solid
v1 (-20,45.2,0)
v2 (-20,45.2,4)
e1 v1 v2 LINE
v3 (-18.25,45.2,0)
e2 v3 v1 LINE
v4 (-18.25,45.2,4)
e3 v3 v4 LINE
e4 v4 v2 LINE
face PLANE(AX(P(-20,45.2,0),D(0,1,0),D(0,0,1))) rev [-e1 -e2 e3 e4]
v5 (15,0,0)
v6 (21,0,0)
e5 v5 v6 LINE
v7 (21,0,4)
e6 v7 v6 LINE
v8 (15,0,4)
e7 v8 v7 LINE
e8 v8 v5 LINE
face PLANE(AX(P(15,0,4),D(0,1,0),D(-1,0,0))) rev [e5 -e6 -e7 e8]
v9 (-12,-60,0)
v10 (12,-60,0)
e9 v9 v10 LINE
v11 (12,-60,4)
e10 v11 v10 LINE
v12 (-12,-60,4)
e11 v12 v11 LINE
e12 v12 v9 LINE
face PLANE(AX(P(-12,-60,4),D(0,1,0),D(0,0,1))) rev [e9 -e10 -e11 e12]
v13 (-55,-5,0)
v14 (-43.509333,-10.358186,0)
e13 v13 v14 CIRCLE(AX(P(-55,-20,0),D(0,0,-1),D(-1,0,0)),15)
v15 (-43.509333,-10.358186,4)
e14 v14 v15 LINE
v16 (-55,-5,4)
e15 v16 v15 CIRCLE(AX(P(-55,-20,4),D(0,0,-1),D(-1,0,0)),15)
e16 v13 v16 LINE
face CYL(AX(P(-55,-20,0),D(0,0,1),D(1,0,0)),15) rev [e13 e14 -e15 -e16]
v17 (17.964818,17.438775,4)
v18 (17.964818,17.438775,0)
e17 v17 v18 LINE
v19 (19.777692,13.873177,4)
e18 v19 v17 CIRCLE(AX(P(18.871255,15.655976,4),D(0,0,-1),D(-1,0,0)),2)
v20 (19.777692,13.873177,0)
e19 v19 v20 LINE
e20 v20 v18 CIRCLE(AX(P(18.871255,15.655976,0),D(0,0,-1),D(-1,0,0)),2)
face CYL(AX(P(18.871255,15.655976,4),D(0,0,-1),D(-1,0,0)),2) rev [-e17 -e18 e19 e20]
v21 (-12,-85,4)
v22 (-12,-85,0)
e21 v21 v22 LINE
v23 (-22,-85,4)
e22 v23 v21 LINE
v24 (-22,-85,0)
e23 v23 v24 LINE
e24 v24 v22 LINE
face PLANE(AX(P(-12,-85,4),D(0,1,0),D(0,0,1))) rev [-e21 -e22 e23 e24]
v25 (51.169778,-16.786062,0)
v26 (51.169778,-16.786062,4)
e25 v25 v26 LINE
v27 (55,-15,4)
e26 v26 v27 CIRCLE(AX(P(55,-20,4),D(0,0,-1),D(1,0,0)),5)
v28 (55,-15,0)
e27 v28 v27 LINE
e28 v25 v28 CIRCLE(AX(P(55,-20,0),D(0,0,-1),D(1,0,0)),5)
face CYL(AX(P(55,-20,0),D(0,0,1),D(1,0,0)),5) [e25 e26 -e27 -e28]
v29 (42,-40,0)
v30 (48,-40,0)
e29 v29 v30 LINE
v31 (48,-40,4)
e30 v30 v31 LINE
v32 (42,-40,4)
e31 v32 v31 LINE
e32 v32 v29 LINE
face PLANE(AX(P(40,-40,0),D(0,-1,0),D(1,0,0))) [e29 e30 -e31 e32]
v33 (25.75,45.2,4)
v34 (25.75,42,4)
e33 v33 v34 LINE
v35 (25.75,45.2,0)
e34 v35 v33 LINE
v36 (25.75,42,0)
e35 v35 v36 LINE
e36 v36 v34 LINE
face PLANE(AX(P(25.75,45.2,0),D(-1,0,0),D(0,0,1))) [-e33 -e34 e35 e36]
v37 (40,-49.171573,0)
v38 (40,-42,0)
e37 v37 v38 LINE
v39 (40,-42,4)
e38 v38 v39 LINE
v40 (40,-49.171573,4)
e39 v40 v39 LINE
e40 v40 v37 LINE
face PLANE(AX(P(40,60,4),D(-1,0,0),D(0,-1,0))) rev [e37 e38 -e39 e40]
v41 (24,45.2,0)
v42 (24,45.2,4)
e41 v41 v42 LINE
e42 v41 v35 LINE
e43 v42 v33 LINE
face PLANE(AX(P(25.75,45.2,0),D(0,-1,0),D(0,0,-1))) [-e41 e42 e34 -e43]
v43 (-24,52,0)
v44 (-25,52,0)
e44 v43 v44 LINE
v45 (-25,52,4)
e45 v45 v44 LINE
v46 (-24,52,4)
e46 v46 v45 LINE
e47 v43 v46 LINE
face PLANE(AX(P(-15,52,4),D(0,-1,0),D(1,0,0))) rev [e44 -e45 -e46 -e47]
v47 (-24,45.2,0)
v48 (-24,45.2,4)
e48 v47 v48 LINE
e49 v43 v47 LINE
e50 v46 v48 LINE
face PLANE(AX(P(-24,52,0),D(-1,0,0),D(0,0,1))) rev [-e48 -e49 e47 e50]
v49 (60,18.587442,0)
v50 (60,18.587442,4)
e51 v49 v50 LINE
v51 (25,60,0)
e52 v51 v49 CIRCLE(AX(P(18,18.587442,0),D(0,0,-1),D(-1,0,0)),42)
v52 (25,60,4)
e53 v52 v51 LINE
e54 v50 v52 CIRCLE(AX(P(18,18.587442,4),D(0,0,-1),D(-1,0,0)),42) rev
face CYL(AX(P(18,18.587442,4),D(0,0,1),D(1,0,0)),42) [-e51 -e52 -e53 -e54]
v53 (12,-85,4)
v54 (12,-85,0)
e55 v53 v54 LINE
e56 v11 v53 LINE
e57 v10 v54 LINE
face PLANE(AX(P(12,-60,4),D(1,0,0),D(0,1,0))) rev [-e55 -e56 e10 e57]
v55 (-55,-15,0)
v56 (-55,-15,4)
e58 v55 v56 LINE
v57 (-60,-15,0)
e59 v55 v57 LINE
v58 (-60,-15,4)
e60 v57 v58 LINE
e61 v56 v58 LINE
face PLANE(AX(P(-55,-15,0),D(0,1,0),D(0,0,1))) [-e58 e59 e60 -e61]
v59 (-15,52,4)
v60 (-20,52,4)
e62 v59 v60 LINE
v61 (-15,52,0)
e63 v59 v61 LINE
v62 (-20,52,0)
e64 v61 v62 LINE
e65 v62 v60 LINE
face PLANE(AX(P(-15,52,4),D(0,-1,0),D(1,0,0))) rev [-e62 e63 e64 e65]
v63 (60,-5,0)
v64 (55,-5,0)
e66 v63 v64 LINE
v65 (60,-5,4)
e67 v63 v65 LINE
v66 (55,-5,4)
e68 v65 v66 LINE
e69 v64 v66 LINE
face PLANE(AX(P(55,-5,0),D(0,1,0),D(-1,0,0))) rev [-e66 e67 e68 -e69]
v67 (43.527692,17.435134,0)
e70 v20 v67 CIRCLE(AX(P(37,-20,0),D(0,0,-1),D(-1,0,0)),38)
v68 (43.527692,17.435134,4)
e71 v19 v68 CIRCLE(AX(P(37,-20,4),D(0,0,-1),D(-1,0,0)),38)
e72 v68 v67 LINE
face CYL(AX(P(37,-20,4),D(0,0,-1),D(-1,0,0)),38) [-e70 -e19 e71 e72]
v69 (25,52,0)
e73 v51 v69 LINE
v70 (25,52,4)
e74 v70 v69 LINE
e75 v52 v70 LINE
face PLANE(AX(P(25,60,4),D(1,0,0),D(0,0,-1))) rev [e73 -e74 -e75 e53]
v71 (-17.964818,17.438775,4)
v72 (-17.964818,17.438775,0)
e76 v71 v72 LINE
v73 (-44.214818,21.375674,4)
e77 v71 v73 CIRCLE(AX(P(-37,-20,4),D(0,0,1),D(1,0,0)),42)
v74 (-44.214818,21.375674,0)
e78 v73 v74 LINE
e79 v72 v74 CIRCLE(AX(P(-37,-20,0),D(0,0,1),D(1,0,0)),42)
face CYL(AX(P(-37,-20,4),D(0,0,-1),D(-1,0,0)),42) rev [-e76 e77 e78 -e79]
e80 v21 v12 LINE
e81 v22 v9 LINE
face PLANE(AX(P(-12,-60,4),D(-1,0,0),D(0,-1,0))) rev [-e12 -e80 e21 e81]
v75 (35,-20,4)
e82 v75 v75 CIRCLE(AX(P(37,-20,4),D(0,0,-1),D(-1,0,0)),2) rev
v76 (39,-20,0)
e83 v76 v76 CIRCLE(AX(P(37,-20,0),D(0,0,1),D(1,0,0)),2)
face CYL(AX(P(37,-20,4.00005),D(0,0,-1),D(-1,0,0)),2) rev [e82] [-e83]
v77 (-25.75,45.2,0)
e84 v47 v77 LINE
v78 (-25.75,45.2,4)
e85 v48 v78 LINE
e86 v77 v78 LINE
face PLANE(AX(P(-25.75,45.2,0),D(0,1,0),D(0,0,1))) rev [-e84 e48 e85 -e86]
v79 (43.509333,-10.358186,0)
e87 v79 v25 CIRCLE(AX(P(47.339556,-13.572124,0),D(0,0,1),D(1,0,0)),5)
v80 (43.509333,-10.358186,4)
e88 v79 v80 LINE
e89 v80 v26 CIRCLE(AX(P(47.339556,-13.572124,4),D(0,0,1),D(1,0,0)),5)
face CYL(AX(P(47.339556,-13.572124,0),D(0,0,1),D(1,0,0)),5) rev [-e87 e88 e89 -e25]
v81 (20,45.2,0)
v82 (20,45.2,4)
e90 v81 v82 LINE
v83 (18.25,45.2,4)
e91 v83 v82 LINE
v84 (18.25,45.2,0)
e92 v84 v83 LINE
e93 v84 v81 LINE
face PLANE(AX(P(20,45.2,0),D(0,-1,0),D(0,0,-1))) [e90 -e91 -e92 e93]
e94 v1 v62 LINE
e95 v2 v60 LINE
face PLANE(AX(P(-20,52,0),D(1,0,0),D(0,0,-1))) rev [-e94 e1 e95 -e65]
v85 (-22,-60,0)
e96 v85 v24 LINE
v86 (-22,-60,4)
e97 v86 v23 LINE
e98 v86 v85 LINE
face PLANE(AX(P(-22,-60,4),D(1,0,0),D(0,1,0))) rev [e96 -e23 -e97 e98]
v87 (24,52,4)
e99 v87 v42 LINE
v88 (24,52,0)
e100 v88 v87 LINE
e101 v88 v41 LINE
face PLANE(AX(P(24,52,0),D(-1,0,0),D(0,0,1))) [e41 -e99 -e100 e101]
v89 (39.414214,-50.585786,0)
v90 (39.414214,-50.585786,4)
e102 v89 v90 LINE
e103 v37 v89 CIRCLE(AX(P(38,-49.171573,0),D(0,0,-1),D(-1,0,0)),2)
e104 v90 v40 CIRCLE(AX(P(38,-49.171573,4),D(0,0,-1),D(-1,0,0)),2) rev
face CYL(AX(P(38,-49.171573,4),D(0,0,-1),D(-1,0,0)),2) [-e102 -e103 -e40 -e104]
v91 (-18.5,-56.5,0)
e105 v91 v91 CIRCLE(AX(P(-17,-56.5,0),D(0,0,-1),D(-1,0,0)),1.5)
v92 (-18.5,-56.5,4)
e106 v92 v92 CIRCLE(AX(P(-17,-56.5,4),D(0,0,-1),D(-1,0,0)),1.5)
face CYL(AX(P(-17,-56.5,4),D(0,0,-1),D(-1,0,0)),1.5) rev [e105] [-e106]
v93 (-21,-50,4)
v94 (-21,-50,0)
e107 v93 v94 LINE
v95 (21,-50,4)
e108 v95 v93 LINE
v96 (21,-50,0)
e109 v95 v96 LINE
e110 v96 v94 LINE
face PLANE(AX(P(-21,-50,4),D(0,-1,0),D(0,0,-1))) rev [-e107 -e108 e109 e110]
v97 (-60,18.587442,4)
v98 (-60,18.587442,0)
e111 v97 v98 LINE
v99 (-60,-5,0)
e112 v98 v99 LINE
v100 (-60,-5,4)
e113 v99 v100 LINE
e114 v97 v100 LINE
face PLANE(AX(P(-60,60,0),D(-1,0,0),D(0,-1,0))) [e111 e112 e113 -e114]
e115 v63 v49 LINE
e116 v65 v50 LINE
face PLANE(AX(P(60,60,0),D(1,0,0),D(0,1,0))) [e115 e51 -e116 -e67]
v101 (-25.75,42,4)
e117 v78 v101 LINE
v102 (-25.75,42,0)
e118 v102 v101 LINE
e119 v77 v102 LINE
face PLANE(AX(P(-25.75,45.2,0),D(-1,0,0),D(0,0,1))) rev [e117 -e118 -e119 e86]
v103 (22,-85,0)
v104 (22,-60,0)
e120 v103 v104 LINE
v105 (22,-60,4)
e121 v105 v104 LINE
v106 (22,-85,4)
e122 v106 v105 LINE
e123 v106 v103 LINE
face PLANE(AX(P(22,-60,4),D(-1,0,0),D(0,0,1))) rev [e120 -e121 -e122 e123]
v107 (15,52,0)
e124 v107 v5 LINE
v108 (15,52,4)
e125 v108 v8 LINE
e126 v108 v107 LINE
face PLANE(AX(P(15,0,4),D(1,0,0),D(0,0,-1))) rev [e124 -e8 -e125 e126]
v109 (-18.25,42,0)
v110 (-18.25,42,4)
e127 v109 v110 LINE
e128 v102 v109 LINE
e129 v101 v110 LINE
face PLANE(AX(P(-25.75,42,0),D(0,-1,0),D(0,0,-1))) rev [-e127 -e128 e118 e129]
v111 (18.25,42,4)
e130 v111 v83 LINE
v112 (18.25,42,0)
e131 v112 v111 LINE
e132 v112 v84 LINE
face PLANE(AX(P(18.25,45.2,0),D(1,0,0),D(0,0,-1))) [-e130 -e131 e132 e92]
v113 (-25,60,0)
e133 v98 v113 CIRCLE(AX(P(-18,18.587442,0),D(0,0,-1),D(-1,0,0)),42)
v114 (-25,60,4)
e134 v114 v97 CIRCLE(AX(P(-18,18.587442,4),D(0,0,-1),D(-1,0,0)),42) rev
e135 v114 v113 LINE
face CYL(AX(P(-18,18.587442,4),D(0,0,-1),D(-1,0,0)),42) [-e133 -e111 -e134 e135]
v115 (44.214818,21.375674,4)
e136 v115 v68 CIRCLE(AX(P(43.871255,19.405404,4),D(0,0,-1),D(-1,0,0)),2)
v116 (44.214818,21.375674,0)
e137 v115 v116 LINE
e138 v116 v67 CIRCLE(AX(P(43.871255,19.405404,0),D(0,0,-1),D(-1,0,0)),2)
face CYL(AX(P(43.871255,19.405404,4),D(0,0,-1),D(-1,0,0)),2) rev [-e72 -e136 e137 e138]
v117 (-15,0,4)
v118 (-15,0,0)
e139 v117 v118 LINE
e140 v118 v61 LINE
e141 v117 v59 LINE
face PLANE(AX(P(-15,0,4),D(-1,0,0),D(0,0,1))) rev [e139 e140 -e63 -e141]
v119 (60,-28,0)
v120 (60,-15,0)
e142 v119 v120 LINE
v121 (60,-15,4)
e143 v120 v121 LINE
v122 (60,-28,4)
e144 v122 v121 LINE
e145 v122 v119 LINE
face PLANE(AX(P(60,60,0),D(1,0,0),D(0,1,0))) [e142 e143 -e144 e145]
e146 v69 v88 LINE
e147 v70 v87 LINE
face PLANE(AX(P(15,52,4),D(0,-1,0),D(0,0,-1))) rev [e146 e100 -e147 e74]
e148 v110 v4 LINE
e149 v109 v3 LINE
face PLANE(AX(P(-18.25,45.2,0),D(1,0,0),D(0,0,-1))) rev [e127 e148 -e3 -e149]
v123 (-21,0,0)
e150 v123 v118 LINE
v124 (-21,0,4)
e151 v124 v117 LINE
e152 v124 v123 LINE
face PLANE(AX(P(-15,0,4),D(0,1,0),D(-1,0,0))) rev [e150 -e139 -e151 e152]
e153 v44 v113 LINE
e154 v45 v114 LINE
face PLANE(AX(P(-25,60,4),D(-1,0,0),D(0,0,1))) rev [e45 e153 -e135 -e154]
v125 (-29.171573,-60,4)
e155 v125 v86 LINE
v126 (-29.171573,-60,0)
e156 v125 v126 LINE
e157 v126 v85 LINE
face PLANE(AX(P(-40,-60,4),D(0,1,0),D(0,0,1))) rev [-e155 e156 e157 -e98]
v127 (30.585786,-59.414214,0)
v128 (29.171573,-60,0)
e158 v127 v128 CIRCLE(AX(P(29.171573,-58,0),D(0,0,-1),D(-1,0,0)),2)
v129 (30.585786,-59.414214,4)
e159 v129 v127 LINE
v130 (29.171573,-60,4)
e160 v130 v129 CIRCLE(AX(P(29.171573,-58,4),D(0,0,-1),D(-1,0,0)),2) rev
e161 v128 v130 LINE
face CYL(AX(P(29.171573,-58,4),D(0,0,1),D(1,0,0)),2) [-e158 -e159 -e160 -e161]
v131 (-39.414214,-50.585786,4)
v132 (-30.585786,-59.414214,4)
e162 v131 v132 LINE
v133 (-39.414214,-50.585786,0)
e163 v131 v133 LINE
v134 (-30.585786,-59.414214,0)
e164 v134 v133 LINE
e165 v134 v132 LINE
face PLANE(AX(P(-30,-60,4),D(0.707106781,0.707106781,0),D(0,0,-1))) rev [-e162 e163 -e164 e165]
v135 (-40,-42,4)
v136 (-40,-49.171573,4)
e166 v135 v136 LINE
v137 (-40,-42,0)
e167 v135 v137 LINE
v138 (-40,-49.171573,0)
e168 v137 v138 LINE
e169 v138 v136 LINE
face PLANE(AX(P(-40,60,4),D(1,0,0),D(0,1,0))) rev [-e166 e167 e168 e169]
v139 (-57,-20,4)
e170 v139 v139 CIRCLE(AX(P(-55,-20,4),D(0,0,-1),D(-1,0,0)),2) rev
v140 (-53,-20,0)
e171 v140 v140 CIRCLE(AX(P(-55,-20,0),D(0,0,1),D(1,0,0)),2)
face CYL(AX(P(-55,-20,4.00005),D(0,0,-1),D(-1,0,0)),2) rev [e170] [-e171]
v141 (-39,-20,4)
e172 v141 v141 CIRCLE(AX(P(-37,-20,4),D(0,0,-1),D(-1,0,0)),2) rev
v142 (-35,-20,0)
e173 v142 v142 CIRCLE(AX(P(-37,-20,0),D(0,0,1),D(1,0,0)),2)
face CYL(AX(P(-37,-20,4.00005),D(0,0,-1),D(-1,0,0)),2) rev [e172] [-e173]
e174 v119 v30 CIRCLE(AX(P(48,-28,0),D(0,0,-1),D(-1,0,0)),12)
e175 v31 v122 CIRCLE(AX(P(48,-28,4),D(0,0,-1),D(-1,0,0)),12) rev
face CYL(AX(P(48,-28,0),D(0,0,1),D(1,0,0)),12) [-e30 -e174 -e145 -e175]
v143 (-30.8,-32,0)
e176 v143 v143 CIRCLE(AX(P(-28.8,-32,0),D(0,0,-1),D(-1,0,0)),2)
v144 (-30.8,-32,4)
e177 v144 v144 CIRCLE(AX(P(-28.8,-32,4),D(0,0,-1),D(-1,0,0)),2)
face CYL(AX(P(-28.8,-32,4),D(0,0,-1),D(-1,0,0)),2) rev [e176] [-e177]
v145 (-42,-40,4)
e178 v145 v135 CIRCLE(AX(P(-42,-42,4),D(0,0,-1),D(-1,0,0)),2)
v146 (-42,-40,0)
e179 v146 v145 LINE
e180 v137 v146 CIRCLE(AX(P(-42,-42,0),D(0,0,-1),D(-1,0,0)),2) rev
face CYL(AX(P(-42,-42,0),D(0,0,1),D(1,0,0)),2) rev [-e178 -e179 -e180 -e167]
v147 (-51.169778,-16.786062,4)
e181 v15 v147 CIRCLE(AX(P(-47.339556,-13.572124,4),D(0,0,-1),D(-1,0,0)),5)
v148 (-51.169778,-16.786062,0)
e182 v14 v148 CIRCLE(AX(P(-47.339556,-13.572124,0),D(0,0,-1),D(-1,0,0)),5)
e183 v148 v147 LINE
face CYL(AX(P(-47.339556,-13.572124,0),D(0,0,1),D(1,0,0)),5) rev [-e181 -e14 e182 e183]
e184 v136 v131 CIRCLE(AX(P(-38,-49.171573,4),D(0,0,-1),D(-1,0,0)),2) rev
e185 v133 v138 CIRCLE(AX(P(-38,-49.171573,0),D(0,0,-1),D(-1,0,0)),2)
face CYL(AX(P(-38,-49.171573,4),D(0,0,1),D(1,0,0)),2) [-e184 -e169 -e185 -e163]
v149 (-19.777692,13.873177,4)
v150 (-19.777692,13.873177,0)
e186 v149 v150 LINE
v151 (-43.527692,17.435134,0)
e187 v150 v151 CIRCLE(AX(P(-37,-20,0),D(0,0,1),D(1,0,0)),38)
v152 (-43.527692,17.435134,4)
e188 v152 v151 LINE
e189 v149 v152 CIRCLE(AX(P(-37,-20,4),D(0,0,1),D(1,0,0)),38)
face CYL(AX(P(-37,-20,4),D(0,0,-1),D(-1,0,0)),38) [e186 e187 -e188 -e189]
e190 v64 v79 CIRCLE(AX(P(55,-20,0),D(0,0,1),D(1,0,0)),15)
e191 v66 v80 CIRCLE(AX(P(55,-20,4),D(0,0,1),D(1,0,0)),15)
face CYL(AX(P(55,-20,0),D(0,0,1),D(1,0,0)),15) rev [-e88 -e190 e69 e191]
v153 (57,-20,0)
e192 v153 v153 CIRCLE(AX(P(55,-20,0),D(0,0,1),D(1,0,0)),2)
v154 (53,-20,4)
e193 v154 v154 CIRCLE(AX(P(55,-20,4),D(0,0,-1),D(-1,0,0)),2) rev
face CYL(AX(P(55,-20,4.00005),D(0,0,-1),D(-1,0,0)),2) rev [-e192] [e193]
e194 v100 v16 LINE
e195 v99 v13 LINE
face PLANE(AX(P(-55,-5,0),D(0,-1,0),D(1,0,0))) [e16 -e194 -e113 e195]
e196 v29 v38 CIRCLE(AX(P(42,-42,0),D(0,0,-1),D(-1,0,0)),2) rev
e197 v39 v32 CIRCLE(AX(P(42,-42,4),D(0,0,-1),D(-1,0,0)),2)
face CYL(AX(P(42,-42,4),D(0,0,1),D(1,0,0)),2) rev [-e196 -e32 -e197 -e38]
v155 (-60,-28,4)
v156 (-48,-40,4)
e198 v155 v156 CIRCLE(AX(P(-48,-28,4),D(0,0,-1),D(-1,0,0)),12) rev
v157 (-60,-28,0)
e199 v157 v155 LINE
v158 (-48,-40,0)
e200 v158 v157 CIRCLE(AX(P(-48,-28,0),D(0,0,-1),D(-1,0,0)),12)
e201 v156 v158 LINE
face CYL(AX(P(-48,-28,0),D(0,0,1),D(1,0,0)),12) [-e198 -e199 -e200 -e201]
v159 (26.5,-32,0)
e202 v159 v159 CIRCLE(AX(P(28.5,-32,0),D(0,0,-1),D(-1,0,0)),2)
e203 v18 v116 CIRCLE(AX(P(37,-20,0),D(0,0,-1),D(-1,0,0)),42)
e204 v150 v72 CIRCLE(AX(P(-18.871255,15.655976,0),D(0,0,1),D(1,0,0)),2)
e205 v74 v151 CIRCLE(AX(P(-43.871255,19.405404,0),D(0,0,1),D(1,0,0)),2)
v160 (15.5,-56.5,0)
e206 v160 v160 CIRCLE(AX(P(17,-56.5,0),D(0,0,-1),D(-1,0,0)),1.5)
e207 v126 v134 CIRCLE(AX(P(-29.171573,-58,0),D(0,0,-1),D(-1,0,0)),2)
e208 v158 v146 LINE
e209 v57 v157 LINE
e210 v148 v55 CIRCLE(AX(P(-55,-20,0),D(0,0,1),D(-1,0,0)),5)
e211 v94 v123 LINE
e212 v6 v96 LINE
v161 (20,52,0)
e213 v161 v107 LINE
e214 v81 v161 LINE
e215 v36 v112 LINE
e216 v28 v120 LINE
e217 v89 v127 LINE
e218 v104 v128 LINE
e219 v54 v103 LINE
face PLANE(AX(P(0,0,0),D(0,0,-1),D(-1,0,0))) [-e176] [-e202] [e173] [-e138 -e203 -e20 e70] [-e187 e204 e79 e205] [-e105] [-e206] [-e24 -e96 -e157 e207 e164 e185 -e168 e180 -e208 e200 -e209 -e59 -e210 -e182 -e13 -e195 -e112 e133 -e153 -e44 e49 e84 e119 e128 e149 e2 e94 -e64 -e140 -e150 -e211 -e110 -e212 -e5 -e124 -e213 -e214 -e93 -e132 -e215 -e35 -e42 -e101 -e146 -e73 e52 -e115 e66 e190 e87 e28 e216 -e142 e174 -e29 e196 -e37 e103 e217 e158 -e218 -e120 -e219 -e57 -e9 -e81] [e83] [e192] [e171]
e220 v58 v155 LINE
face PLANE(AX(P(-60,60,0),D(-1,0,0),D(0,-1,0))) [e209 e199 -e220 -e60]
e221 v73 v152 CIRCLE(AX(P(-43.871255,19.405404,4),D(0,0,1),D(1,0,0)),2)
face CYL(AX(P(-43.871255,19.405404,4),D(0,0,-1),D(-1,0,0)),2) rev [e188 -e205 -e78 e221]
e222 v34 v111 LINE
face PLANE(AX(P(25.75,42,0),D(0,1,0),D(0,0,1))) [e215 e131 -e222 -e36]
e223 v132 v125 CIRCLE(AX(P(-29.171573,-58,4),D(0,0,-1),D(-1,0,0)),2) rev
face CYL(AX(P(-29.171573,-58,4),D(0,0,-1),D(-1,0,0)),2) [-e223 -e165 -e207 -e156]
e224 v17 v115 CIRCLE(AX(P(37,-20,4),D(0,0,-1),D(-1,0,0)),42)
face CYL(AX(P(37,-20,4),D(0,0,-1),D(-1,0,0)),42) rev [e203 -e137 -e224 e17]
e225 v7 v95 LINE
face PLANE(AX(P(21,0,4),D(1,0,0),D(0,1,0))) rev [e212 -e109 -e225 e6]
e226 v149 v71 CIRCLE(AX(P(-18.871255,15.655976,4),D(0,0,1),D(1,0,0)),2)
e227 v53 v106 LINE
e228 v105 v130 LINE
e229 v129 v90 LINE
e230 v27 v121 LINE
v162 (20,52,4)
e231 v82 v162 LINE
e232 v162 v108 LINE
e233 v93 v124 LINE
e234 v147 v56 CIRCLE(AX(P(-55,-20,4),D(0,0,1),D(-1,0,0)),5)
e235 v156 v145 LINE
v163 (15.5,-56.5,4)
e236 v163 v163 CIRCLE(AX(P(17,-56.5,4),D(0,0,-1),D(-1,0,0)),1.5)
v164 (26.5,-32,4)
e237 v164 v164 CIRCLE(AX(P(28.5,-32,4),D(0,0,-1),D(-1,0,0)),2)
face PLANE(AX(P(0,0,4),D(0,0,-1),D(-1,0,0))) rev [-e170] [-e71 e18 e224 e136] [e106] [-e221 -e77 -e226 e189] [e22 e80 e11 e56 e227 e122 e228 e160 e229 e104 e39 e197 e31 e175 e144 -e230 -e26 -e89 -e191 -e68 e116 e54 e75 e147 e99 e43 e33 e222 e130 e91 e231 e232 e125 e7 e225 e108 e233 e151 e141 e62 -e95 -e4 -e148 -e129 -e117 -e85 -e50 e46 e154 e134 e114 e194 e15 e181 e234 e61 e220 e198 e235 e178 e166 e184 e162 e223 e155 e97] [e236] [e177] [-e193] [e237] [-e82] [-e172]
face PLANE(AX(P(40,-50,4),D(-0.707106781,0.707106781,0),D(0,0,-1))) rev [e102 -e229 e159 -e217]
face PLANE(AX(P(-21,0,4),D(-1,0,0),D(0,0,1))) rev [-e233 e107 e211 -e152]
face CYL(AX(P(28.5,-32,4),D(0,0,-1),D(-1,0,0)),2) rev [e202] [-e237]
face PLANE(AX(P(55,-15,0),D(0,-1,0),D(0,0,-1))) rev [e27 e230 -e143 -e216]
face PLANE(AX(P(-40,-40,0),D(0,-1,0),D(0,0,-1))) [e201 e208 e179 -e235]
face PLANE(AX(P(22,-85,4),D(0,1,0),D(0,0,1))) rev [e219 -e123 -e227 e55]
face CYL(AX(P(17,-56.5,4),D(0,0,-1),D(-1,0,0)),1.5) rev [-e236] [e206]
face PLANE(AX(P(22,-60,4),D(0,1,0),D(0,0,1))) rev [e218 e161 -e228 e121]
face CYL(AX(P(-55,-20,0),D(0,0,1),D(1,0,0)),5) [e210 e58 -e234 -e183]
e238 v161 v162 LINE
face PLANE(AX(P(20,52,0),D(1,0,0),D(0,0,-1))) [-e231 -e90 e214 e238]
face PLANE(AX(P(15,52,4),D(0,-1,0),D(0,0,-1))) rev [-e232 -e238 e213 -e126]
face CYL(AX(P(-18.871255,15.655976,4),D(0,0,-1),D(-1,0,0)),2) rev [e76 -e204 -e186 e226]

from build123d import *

# Parameters (mm, degrees)
BOSS_EXTRUDE1_DEPTH = 4
SKETCH2_R           = 2
SKETCH2_R_2         = 1.5
CUT_EXTRUDE1_DEPTH  = 95.026591983
SKETCH4_W           = 20
SKETCH4_H           = 100
BOSS_EXTRUDE2_DEPTH = 4
FILLET3_R           = 42
FILLET4_R           = 12
SKETCH7_R           = 2
CUT_EXTRUDE3_DEPTH  = 105.120122935
CHAMFER1_SIZE       = 10
FILLET8_R           = 2
CUT_EXTRUDE4_DEPTH  = 105.120122935
CUT_EXTRUDE5_DEPTH  = 105.120122935
SKETCH10_R          = 2
CUT_EXTRUDE6_DEPTH  = 105.120122935


with BuildPart() as part:
    # Sketch1 → Boss-Extrude1 (new body)
    with BuildSketch(Plane.XY):
        Polygon((-40, 60), (-25, 60), (-25, 52), (-15, 52), (-15, 0), (-21, 0), (-21, -50), (21, -50), (21, 0), (15, 0), (15, 52), (25, 52), (25, 60), (40, 60), (40, -60), (22, -60), (22, -85), (12, -85), (12, -60), (-12, -60), (-12, -85), (-22, -85), (-22, -60), (-40, -60), align=None)
    extrude(amount=BOSS_EXTRUDE1_DEPTH)

    # Sketch2 → Cut-Extrude1 (cut, through all)
    with BuildSketch(Plane(origin=(0, 0, 0), x_dir=(-1, 0, 0), z_dir=(0, 0, -1))):
        with Locations((-28.5, -32)):
            Circle(SKETCH2_R)
        with Locations((17, -56.5)):
            Circle(SKETCH2_R_2)
        with Locations((28.8, -32)):
            Circle(SKETCH2_R)
        with Locations((-17, -56.5)):
            Circle(SKETCH2_R_2)
    extrude(amount=-CUT_EXTRUDE1_DEPTH, mode=Mode.SUBTRACT)

    # Sketch4 → Boss-Extrude2 (add)
    with BuildSketch(Plane.XY.offset(4)):
        with Locations((-50, 10)):
            Rectangle(SKETCH4_W, SKETCH4_H)
        with Locations((50, 10)):
            Rectangle(SKETCH4_W, SKETCH4_H)
    extrude(amount=-BOSS_EXTRUDE2_DEPTH)

    # Fillet3
    # the kernel refuses this fillet: 42 mm, written as the material it takes off along each edge
    with BuildSketch(Plane(origin=(60, 60, 107.531396204), x_dir=(0, -1, 0), z_dir=(0, 0, -1))) as fillet3_piece_1:
        with BuildLine():
            CenterArc((41.412558482, 42), FILLET3_R, 189.594068227, 80.405931773)
            Line((0, 35), (-0.82825117, 34.86))
            ThreePointArc((-0.82825117, 34.86), (-0.84, 17.5), (-0.84, 0))
            Line((-0.84, 0), (0, -0.84))
            Line((0, -0.84), (41.412558482, -0.84))
            Line((41.412558482, -0.84), (41.412558482, 0))
        make_face()
    extrude(amount=211.062792409, mode=Mode.SUBTRACT)
    with BuildSketch(Plane(origin=(-60, 60, 107.531396204), x_dir=(1, 0, 0), z_dir=(0, 0, -1))) as fillet3_piece_2:
        with BuildLine():
            CenterArc((42, 41.412558482), FILLET3_R, 180, 80.405931773)
            Line((0, 41.412558482), (-0.84, 41.412558482))
            Line((-0.84, 41.412558482), (-0.84, 0))
            Line((-0.84, 0), (0, -0.84))
            ThreePointArc((0, -0.84), (17.5, -0.84), (34.86, -0.82825117))
            Line((34.86, -0.82825117), (35, 0))
        make_face()
    extrude(amount=211.062792409, mode=Mode.SUBTRACT)

    # Fillet4
    fillet4_edges = [part.edges().sort_by_distance(p)[0] for p in [
        (60, -40, 2),
        (-60, -40, 2),
    ]]
    fillet(fillet4_edges, radius=FILLET4_R)

    # Sketch7 → Cut-Extrude3 (cut, through all)
    with BuildSketch(Plane.XY):
        with Locations(Location((-55, -20, 0), (0, 0, 180))):
            Circle(SKETCH7_R)
        with Locations(Location((55, -20, 0), (0, 0, 180))):
            Circle(SKETCH7_R)
        with Locations(Location((-37, -20, 0), (0, 0, 180))):
            Circle(SKETCH7_R)
        with Locations(Location((37, -20, 0), (0, 0, 180))):
            Circle(SKETCH7_R)
    extrude(amount=CUT_EXTRUDE3_DEPTH, mode=Mode.SUBTRACT)

    # Chamfer1
    chamfer1_edges = [part.edges().sort_by_distance(p)[0] for p in [
        (-40, -60, 2),
        (40, -60, 2),
    ]]
    chamfer(chamfer1_edges, length=CHAMFER1_SIZE)

    # Fillet8
    fillet8_edges = [part.edges().sort_by_distance(p)[0] for p in [
        (-30, -60, 2),
        (-40, -50, 2),
        (30, -60, 2),
        (40, -50, 2),
        (40, -40, 2),
        (-40, -40, 2),
    ]]
    fillet(fillet8_edges, radius=FILLET8_R)

    # Sketch8 → Cut-Extrude4 (cut, through all)
    with BuildSketch(Plane(origin=(0, 0, 0), x_dir=(-1, 0, 0), z_dir=(0, 0, -1))):
        with BuildLine():
            ThreePointArc((-17.964817996, 17.438774634), (-30.770630407, 21.535466224), (-44.214817996, 21.375674028))
            ThreePointArc((-44.214817996, 21.375674028), (-45.841525426, 19.061841075), (-43.527692473, 17.435133644))
            ThreePointArc((-43.527692473, 17.435133644), (-31.363903701, 17.579707536), (-19.777692473, 13.87317705))
            ThreePointArc((-19.777692473, 13.87317705), (-17.088456442, 14.749538603), (-17.964817996, 17.438774634))
        make_face()
        with BuildLine():
            ThreePointArc((17.964817996, 17.438774634), (30.770630407, 21.535466224), (44.214817996, 21.375674028))
            ThreePointArc((44.214817996, 21.375674028), (45.841525426, 19.061841075), (43.527692473, 17.435133644))
            ThreePointArc((43.527692473, 17.435133644), (31.363903701, 17.579707536), (19.777692473, 13.87317705))
            ThreePointArc((19.777692473, 13.87317705), (17.088456442, 14.749538603), (17.964817996, 17.438774634))
        make_face()
    extrude(amount=-CUT_EXTRUDE4_DEPTH, mode=Mode.SUBTRACT)

    # Sketch9 → Cut-Extrude5 (cut, through all)
    with BuildSketch(Plane.XY.offset(4)):
        Polygon((-24, 52), (-20, 52), (-20, 45.2), (-18.25, 45.2), (-18.25, 42), (-25.75, 42), (-25.75, 45.2), (-24, 45.2), align=None)
    cut_extrude5 = extrude(amount=-CUT_EXTRUDE5_DEPTH, mode=Mode.SUBTRACT)

    # Mirror1: Cut-Extrude5 across plane
    add(cut_extrude5.mirror(Plane(origin=(0, 0, 0), x_dir=(0, 0, 1), z_dir=(1, 0, 0))), mode=Mode.SUBTRACT)

    # Sketch10 → Cut-Extrude6 (cut, through all)
    with BuildSketch(Plane.XY.offset(4)):
        with Locations(Location((55, -20, 0), (0, 0, 180))):
            Circle(SKETCH10_R)
        with BuildLine():
            Line((55, -5), (60, -5))
            Line((60, -5), (60, -15))
            Line((60, -15), (55, -15))
            ThreePointArc((55, -15), (52.886908691, -15.468461065), (51.169777784, -16.786061952))
            ThreePointArc((51.169777784, -16.786061952), (44.12561752, -17.402346119), (43.509333353, -10.358185855))
            ThreePointArc((43.509333353, -10.358185855), (48.660726074, -6.405383194), (55, -5))
        make_face()
    cut_extrude6 = extrude(amount=-CUT_EXTRUDE6_DEPTH, mode=Mode.SUBTRACT)

    # Mirror2: Cut-Extrude6 across plane
    add(cut_extrude6.mirror(Plane(origin=(0, 0, 0), x_dir=(0, 0, 1), z_dir=(1, 0, 0))), mode=Mode.SUBTRACT)


solid = part.part
